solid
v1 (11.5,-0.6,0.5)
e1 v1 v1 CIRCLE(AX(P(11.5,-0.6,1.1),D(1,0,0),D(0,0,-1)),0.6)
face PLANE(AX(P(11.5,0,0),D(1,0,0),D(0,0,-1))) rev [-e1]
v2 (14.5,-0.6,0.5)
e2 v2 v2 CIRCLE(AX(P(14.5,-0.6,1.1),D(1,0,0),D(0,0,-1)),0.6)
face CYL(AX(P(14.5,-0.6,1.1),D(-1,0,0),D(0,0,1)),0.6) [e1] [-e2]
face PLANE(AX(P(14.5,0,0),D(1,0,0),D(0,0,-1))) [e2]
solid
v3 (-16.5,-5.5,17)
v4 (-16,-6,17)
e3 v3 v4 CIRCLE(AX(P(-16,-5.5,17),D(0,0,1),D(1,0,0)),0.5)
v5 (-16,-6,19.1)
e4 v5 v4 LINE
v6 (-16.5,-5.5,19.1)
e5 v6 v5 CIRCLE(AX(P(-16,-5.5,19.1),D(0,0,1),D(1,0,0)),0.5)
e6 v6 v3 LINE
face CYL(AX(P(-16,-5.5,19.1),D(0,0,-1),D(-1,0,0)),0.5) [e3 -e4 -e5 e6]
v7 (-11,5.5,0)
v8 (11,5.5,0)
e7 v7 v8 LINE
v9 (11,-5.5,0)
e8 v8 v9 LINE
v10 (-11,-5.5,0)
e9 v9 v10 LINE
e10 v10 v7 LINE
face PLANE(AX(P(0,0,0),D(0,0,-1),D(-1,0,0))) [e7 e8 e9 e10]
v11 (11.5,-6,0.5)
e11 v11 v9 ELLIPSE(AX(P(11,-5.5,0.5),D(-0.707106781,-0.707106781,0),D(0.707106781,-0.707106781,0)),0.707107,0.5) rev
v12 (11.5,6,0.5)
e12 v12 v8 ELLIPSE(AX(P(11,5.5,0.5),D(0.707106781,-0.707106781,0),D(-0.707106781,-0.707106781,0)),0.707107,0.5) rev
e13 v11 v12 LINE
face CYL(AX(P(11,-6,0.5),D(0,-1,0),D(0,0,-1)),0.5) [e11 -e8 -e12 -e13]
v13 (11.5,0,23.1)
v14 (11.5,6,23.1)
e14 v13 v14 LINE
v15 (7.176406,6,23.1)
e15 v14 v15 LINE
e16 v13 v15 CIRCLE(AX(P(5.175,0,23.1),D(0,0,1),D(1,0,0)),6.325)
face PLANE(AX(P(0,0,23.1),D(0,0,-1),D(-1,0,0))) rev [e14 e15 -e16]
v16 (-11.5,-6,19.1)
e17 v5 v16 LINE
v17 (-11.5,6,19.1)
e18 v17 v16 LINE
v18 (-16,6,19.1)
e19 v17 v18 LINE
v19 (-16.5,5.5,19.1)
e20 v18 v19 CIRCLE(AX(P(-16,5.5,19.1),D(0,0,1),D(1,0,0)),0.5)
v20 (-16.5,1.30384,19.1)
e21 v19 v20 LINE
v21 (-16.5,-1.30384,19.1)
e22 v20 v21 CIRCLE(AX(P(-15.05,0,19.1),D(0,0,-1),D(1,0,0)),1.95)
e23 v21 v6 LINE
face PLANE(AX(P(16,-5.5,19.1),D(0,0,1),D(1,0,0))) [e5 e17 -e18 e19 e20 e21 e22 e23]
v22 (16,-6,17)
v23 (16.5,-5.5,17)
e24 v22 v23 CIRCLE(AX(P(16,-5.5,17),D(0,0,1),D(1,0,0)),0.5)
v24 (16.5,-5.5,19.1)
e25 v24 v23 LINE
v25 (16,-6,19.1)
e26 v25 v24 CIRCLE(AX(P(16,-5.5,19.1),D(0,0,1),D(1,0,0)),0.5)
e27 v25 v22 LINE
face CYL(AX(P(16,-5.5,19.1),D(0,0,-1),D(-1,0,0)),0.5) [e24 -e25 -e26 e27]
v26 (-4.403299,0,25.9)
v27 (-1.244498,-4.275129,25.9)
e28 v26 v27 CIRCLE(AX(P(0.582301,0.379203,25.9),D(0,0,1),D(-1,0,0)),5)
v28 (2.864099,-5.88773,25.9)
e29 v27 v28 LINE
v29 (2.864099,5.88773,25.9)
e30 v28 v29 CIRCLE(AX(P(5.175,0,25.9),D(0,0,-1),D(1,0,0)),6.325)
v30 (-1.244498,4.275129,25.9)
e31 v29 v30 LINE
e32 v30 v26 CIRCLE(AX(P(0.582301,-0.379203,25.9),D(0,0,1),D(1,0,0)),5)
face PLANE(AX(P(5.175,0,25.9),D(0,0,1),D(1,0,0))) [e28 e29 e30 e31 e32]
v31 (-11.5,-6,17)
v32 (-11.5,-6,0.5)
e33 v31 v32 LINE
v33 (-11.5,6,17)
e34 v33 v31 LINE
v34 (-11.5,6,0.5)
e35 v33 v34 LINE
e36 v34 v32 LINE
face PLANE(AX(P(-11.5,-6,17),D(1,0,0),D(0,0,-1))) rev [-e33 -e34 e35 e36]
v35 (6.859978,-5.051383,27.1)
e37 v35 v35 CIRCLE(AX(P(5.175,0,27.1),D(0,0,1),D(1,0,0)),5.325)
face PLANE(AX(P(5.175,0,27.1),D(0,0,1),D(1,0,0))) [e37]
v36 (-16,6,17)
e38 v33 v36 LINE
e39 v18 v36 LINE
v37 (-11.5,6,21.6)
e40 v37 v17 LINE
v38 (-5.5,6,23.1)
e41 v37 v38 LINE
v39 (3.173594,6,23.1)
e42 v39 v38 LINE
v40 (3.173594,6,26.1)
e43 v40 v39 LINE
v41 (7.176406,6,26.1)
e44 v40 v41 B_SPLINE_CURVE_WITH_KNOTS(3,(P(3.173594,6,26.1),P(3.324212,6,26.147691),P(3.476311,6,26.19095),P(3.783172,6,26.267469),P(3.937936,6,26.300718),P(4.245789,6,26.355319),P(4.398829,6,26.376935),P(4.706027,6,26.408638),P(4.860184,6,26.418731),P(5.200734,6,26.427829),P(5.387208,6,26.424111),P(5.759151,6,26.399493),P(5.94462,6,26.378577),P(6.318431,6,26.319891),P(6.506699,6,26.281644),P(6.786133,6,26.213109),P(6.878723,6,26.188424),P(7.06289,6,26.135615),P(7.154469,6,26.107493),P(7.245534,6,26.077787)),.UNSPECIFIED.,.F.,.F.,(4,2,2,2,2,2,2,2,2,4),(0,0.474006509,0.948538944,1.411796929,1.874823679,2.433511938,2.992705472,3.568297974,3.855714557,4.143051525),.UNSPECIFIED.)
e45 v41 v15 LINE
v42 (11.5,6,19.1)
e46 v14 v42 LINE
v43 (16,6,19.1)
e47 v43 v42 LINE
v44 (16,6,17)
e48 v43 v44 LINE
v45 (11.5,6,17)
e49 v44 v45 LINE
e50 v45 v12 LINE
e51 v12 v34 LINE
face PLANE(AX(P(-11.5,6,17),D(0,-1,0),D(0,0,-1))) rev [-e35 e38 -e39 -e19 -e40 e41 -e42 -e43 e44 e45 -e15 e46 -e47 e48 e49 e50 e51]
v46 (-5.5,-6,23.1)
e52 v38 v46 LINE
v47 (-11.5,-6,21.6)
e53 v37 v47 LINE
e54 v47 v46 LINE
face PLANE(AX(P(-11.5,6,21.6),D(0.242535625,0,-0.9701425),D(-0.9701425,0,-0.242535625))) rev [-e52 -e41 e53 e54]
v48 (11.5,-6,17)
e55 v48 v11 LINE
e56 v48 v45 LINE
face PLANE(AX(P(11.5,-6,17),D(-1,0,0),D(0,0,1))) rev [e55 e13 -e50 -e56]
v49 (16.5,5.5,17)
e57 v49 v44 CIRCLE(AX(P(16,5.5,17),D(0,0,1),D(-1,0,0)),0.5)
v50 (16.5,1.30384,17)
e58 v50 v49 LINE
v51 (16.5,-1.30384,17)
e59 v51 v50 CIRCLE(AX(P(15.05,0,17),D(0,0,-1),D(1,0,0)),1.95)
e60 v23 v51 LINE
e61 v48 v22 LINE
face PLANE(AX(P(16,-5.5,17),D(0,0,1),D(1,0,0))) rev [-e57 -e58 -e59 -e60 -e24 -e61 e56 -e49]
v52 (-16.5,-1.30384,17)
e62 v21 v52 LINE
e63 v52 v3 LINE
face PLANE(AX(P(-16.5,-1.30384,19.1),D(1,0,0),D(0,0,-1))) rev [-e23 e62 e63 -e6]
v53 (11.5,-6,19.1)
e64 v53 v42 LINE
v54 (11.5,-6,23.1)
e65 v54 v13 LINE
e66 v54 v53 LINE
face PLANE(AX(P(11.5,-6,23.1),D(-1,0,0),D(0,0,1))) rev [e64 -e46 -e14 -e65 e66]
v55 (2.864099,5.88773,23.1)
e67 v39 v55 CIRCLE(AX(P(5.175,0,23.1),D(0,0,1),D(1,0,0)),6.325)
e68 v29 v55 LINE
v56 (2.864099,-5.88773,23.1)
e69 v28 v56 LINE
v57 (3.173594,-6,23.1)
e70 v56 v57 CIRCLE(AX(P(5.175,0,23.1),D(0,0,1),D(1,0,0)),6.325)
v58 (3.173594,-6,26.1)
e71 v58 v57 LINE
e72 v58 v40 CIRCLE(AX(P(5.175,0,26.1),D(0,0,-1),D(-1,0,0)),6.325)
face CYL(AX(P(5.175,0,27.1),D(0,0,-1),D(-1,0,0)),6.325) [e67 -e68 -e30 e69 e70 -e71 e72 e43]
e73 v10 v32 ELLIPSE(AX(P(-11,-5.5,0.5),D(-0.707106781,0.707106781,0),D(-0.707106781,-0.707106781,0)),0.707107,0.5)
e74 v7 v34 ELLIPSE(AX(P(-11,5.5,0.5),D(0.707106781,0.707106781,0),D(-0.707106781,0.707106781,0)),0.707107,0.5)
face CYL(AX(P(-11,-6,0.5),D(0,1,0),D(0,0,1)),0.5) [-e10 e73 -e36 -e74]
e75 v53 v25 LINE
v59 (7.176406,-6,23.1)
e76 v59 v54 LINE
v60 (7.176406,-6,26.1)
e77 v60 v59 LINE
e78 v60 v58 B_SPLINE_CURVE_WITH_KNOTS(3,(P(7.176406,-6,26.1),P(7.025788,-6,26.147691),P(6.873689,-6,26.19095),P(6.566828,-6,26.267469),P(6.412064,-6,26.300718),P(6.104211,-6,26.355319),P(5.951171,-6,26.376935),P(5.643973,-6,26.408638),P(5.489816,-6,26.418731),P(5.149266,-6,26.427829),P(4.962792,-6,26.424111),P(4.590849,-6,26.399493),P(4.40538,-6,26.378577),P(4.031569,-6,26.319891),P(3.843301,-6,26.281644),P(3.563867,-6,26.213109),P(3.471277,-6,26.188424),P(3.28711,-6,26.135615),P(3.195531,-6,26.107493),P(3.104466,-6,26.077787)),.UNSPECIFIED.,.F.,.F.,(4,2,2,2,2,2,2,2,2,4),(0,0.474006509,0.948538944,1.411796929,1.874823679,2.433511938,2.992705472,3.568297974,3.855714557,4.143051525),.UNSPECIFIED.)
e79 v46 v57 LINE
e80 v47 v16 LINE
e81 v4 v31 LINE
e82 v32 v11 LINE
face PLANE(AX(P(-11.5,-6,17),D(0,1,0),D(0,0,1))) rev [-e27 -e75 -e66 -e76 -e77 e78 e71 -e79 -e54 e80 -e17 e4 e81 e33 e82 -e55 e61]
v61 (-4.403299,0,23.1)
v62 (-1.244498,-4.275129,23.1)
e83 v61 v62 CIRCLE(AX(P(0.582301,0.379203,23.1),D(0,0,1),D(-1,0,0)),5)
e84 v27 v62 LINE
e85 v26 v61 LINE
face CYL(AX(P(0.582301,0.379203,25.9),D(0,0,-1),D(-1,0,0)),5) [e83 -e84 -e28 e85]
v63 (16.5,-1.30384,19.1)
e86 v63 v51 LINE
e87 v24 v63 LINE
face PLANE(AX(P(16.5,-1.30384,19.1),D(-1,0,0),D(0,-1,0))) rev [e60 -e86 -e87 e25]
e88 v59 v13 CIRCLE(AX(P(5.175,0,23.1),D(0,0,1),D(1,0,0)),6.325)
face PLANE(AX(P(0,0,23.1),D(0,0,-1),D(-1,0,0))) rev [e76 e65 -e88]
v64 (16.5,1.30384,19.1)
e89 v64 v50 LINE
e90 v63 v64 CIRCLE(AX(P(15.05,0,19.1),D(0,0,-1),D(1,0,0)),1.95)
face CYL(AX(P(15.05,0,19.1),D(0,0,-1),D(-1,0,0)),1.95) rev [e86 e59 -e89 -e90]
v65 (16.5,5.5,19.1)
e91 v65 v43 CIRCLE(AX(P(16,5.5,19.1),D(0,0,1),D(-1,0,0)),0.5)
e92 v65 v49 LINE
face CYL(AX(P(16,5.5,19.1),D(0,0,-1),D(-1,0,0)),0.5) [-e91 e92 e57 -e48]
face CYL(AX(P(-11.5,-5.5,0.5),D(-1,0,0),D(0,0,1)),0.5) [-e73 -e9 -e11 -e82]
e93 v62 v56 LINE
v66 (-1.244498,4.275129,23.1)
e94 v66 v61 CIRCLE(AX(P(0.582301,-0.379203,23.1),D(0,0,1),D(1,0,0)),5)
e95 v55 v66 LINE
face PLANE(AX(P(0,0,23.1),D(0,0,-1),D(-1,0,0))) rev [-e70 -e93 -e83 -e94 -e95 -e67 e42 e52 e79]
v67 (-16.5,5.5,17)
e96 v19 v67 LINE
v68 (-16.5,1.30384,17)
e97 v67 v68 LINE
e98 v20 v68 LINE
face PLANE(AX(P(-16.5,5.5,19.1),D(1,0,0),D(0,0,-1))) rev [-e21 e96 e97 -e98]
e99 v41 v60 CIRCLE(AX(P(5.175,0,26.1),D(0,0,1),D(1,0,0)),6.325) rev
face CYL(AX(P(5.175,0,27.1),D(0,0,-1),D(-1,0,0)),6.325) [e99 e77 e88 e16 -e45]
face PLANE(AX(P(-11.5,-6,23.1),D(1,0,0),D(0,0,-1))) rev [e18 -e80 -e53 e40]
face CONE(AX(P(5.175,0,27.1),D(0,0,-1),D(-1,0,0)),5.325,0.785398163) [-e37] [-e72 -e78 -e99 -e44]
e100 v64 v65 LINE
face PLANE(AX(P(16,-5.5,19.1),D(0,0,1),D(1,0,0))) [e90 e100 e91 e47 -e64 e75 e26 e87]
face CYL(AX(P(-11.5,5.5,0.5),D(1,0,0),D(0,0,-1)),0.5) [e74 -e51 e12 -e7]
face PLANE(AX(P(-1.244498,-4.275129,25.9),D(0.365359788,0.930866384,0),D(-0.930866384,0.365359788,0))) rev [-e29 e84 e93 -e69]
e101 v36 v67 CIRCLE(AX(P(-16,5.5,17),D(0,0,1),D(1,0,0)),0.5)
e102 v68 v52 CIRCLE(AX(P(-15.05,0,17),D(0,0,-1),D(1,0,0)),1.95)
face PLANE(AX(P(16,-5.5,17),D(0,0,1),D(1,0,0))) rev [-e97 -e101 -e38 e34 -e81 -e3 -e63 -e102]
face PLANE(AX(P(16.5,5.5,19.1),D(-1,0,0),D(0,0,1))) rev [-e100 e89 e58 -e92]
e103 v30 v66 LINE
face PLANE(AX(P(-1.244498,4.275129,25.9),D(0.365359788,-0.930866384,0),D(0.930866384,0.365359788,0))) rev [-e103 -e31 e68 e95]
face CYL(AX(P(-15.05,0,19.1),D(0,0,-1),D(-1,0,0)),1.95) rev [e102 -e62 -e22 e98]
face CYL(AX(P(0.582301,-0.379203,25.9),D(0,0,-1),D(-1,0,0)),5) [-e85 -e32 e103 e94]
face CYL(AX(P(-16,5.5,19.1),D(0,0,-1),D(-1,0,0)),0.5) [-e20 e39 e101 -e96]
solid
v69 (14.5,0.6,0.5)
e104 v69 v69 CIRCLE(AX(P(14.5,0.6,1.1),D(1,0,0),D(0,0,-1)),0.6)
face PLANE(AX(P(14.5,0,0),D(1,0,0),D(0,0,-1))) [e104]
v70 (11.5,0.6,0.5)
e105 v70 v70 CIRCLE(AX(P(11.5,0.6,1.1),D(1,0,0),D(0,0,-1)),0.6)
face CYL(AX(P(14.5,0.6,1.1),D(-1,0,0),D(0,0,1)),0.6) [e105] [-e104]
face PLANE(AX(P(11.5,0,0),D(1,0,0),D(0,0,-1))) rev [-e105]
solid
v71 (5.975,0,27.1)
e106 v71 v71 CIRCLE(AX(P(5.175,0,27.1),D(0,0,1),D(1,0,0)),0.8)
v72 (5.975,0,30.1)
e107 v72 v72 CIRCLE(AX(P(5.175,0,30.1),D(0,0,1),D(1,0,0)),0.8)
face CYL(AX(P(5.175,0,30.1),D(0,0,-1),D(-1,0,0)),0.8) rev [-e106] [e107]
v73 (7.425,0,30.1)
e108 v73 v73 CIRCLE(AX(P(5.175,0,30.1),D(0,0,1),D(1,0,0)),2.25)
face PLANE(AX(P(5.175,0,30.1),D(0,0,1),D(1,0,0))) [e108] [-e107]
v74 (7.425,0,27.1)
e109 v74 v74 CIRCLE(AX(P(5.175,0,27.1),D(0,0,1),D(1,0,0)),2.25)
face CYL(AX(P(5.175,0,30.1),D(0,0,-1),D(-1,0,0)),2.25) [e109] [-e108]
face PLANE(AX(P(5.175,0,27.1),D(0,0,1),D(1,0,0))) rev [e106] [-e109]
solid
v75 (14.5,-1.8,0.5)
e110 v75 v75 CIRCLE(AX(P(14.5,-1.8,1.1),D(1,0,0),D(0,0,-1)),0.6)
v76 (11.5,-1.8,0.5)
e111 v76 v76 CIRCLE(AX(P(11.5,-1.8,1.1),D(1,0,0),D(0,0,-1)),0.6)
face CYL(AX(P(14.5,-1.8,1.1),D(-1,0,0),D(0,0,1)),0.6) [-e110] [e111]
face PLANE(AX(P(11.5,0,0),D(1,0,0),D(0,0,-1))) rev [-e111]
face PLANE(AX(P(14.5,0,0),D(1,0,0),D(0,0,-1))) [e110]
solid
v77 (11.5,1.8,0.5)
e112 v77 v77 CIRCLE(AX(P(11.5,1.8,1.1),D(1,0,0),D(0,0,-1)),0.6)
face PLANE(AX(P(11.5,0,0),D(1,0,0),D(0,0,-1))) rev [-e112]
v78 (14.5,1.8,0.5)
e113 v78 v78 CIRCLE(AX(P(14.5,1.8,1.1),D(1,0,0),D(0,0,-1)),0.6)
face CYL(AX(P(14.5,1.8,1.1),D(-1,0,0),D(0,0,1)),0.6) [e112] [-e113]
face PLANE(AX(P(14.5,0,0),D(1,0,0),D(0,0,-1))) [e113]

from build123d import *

# Parameters (mm, degrees)
ESQUISSE1_W             = 23
ESQUISSE1_H             = 12
BOSS_EXTRU_1_DEPTH      = 17
BOSS_EXTRU_2_DEPTH      = 2.1
ESQUISSE3_W             = 23
ESQUISSE3_H             = 12
BOSS_EXTRU_3_DEPTH      = 4
CONG_1_R                = 0.5
BOSS_EXTRU_4_DEPTH      = 4
CHANFREIN1_SIZE         = 1
ENL_V_MAT_EXTRU_1_DEPTH = 34.921379689
BOSS_EXTRU_5_DEPTH      = 2.8
ESQUISSE8_R             = 2.25
ESQUISSE8_R_2           = 0.8
BOSS_EXTRU_6_DEPTH      = 3
ESQUISSE9_R             = 0.6
BOSS_EXTRU_7_DEPTH      = 3
BOSS_EXTRU_7_2_DEPTH    = 3
BOSS_EXTRU_7_3_DEPTH    = 3
BOSS_EXTRU_7_4_DEPTH    = 3


with BuildPart() as part:
    # Esquisse1 → Boss.-Extru.1 (new body)
    with BuildSketch(Plane.XY):
        Rectangle(ESQUISSE1_W, ESQUISSE1_H)
    extrude(amount=BOSS_EXTRU_1_DEPTH)

    # Esquisse2 → Boss.-Extru.2 (add)
    with BuildSketch(Plane.XY.offset(17)):
        with BuildLine():
            Line((-16, 6), (16, 6))
            ThreePointArc((16, 6), (16.353553391, 5.853553391), (16.5, 5.5))
            Line((16.5, 5.5), (16.5, 1.303840481))
            ThreePointArc((16.5, 1.303840481), (13.1, 0), (16.5, -1.303840481))
            Line((16.5, -1.303840481), (16.5, -5.5))
            ThreePointArc((16.5, -5.5), (16.353553391, -5.853553391), (16, -6))
            Line((16, -6), (-16, -6))
            ThreePointArc((-16, -6), (-16.353553391, -5.853553391), (-16.5, -5.5))
            Line((-16.5, -5.5), (-16.5, -1.303840481))
            ThreePointArc((-16.5, -1.303840481), (-13.1, 0), (-16.5, 1.303840481))
            Line((-16.5, 1.303840481), (-16.5, 5.5))
            ThreePointArc((-16.5, 5.5), (-16.353553391, 5.853553391), (-16, 6))
        make_face()
    extrude(amount=BOSS_EXTRU_2_DEPTH)

    # Esquisse3 → Boss.-Extru.3 (add)
    with BuildSketch(Plane.XY.offset(19.1)):
        Rectangle(ESQUISSE3_W, ESQUISSE3_H)
    extrude(amount=BOSS_EXTRU_3_DEPTH)

    # Congé1
    cong_1_edges = [part.edges().sort_by_distance(p)[0] for p in [
        (0, -6, 0),
        (-11.5, 0, 0),
        (0, 6, 0),
        (11.5, 0, 0),
    ]]
    fillet(cong_1_edges, radius=CONG_1_R)

    # Esquisse5 → Boss.-Extru.4 (add)
    with BuildSketch(Plane.XY.offset(23.1)):
        with BuildLine():
            Line((3.173594244, 6), (7.176405756, 6))
            ThreePointArc((7.176405756, 6), (11.5, 0), (7.176405756, -6))
            Line((7.176405756, -6), (3.173594244, -6))
            ThreePointArc((3.173594244, -6), (-1.15, 0), (3.173594244, 6))
        make_face()
    extrude(amount=BOSS_EXTRU_4_DEPTH)

    # Chanfrein1
    # the kernel refuses this chamfer: 1 mm, written as the material it takes off along each edge
    with BuildSketch(Plane(origin=(5.175, 0, 27.1), x_dir=(0.08493945203394825, -0.9963861146604627, 0), z_dir=(0.9963861146604627, 0.08493945203394825, 0))) as chanfrein1_piece_1:
        Polygon((6.325, CHANFREIN1_SIZE), (6.325 - CHANFREIN1_SIZE, 0), (6.325, 0), align=None)
    revolve(axis=Axis((5.175, 0, 27.1), (0, 0, -1)), revolution_arc=189.74508627, mode=Mode.SUBTRACT)
    with BuildSketch(Plane(origin=(5.175, 0, 27.1), x_dir=(-0.08493945203394813, 0.9963861146604627, 0), z_dir=(-0.9963861146604627, -0.08493945203394813, 0))) as chanfrein1_piece_2:
        Polygon((6.325, CHANFREIN1_SIZE), (6.325 - CHANFREIN1_SIZE, 0), (6.325, 0), align=None)
    revolve(axis=Axis((5.175, 0, 27.1), (0, 0, -1)), revolution_arc=189.74508627, mode=Mode.SUBTRACT)

    # Esquisse6 → Enlèv. mat.-Extru.1 (cut, through all)
    with BuildSketch(Plane.XZ.offset(6)):
        Polygon((-11.5, 21.6), (-5.5, 23.1), (-11.5, 23.1), align=None)
    extrude(amount=-ENL_V_MAT_EXTRU_1_DEPTH, mode=Mode.SUBTRACT)

    # Esquisse7 → Boss.-Extru.5 (add)
    with BuildSketch(Plane.XY.offset(23.1)):
        with BuildLine():
            Line((-1.244498087, -4.275128639), (2.864099339, -5.88772988))
            ThreePointArc((2.864099339, -5.88772988), (-1.15, 0), (2.864099339, 5.88772988))
            Line((2.864099339, 5.88772988), (-1.244498087, 4.275128639))
            ThreePointArc((-1.244498087, 4.275128639), (-3.439063989, 2.592096904), (-4.403298896, 0))
            ThreePointArc((-4.403298896, 0), (-3.439063989, -2.592096904), (-1.244498087, -4.275128639))
        make_face()
    extrude(amount=BOSS_EXTRU_5_DEPTH)


with BuildPart() as body_2:
    # Esquisse8 → Boss.-Extru.6 (new body)
    with BuildSketch(Plane.XY.offset(27.1)):
        with Locations((5.175, 0)):
            Circle(ESQUISSE8_R)
        with Locations((5.175, 0)):
            Circle(ESQUISSE8_R_2, mode=Mode.SUBTRACT)
    extrude(amount=BOSS_EXTRU_6_DEPTH)


with BuildPart() as body_3:
    # Esquisse9 → Boss.-Extru.7 (new body)
    with BuildSketch(Plane(origin=(11.5, 0, 0), x_dir=(0, 0, -1), z_dir=(1, 0, 0))):
        with Locations((-1.1, 1.8)):
            Circle(ESQUISSE9_R)
    extrude(amount=BOSS_EXTRU_7_DEPTH)


with BuildPart() as body_4:
    # Esquisse9 → Boss.-Extru.7 2 (new body)
    with BuildSketch(Plane(origin=(11.5, 0, 0), x_dir=(0, 0, -1), z_dir=(1, 0, 0))):
        with Locations((-1.1, 0.6)):
            Circle(ESQUISSE9_R)
    extrude(amount=BOSS_EXTRU_7_2_DEPTH)


with BuildPart() as body_5:
    # Esquisse9 → Boss.-Extru.7 3 (new body)
    with BuildSketch(Plane(origin=(11.5, 0, 0), x_dir=(0, 0, -1), z_dir=(1, 0, 0))):
        with Locations((-1.1, -0.6)):
            Circle(ESQUISSE9_R)
    extrude(amount=BOSS_EXTRU_7_3_DEPTH)


with BuildPart() as body_6:
    # Esquisse9 → Boss.-Extru.7 4 (new body)
    with BuildSketch(Plane(origin=(11.5, 0, 0), x_dir=(0, 0, -1), z_dir=(1, 0, 0))):
        with Locations((-1.1, -1.8)):
            Circle(ESQUISSE9_R)
    extrude(amount=BOSS_EXTRU_7_4_DEPTH)


solid = Compound([part.part, body_2.part, body_3.part, body_4.part, body_5.part, body_6.part])
